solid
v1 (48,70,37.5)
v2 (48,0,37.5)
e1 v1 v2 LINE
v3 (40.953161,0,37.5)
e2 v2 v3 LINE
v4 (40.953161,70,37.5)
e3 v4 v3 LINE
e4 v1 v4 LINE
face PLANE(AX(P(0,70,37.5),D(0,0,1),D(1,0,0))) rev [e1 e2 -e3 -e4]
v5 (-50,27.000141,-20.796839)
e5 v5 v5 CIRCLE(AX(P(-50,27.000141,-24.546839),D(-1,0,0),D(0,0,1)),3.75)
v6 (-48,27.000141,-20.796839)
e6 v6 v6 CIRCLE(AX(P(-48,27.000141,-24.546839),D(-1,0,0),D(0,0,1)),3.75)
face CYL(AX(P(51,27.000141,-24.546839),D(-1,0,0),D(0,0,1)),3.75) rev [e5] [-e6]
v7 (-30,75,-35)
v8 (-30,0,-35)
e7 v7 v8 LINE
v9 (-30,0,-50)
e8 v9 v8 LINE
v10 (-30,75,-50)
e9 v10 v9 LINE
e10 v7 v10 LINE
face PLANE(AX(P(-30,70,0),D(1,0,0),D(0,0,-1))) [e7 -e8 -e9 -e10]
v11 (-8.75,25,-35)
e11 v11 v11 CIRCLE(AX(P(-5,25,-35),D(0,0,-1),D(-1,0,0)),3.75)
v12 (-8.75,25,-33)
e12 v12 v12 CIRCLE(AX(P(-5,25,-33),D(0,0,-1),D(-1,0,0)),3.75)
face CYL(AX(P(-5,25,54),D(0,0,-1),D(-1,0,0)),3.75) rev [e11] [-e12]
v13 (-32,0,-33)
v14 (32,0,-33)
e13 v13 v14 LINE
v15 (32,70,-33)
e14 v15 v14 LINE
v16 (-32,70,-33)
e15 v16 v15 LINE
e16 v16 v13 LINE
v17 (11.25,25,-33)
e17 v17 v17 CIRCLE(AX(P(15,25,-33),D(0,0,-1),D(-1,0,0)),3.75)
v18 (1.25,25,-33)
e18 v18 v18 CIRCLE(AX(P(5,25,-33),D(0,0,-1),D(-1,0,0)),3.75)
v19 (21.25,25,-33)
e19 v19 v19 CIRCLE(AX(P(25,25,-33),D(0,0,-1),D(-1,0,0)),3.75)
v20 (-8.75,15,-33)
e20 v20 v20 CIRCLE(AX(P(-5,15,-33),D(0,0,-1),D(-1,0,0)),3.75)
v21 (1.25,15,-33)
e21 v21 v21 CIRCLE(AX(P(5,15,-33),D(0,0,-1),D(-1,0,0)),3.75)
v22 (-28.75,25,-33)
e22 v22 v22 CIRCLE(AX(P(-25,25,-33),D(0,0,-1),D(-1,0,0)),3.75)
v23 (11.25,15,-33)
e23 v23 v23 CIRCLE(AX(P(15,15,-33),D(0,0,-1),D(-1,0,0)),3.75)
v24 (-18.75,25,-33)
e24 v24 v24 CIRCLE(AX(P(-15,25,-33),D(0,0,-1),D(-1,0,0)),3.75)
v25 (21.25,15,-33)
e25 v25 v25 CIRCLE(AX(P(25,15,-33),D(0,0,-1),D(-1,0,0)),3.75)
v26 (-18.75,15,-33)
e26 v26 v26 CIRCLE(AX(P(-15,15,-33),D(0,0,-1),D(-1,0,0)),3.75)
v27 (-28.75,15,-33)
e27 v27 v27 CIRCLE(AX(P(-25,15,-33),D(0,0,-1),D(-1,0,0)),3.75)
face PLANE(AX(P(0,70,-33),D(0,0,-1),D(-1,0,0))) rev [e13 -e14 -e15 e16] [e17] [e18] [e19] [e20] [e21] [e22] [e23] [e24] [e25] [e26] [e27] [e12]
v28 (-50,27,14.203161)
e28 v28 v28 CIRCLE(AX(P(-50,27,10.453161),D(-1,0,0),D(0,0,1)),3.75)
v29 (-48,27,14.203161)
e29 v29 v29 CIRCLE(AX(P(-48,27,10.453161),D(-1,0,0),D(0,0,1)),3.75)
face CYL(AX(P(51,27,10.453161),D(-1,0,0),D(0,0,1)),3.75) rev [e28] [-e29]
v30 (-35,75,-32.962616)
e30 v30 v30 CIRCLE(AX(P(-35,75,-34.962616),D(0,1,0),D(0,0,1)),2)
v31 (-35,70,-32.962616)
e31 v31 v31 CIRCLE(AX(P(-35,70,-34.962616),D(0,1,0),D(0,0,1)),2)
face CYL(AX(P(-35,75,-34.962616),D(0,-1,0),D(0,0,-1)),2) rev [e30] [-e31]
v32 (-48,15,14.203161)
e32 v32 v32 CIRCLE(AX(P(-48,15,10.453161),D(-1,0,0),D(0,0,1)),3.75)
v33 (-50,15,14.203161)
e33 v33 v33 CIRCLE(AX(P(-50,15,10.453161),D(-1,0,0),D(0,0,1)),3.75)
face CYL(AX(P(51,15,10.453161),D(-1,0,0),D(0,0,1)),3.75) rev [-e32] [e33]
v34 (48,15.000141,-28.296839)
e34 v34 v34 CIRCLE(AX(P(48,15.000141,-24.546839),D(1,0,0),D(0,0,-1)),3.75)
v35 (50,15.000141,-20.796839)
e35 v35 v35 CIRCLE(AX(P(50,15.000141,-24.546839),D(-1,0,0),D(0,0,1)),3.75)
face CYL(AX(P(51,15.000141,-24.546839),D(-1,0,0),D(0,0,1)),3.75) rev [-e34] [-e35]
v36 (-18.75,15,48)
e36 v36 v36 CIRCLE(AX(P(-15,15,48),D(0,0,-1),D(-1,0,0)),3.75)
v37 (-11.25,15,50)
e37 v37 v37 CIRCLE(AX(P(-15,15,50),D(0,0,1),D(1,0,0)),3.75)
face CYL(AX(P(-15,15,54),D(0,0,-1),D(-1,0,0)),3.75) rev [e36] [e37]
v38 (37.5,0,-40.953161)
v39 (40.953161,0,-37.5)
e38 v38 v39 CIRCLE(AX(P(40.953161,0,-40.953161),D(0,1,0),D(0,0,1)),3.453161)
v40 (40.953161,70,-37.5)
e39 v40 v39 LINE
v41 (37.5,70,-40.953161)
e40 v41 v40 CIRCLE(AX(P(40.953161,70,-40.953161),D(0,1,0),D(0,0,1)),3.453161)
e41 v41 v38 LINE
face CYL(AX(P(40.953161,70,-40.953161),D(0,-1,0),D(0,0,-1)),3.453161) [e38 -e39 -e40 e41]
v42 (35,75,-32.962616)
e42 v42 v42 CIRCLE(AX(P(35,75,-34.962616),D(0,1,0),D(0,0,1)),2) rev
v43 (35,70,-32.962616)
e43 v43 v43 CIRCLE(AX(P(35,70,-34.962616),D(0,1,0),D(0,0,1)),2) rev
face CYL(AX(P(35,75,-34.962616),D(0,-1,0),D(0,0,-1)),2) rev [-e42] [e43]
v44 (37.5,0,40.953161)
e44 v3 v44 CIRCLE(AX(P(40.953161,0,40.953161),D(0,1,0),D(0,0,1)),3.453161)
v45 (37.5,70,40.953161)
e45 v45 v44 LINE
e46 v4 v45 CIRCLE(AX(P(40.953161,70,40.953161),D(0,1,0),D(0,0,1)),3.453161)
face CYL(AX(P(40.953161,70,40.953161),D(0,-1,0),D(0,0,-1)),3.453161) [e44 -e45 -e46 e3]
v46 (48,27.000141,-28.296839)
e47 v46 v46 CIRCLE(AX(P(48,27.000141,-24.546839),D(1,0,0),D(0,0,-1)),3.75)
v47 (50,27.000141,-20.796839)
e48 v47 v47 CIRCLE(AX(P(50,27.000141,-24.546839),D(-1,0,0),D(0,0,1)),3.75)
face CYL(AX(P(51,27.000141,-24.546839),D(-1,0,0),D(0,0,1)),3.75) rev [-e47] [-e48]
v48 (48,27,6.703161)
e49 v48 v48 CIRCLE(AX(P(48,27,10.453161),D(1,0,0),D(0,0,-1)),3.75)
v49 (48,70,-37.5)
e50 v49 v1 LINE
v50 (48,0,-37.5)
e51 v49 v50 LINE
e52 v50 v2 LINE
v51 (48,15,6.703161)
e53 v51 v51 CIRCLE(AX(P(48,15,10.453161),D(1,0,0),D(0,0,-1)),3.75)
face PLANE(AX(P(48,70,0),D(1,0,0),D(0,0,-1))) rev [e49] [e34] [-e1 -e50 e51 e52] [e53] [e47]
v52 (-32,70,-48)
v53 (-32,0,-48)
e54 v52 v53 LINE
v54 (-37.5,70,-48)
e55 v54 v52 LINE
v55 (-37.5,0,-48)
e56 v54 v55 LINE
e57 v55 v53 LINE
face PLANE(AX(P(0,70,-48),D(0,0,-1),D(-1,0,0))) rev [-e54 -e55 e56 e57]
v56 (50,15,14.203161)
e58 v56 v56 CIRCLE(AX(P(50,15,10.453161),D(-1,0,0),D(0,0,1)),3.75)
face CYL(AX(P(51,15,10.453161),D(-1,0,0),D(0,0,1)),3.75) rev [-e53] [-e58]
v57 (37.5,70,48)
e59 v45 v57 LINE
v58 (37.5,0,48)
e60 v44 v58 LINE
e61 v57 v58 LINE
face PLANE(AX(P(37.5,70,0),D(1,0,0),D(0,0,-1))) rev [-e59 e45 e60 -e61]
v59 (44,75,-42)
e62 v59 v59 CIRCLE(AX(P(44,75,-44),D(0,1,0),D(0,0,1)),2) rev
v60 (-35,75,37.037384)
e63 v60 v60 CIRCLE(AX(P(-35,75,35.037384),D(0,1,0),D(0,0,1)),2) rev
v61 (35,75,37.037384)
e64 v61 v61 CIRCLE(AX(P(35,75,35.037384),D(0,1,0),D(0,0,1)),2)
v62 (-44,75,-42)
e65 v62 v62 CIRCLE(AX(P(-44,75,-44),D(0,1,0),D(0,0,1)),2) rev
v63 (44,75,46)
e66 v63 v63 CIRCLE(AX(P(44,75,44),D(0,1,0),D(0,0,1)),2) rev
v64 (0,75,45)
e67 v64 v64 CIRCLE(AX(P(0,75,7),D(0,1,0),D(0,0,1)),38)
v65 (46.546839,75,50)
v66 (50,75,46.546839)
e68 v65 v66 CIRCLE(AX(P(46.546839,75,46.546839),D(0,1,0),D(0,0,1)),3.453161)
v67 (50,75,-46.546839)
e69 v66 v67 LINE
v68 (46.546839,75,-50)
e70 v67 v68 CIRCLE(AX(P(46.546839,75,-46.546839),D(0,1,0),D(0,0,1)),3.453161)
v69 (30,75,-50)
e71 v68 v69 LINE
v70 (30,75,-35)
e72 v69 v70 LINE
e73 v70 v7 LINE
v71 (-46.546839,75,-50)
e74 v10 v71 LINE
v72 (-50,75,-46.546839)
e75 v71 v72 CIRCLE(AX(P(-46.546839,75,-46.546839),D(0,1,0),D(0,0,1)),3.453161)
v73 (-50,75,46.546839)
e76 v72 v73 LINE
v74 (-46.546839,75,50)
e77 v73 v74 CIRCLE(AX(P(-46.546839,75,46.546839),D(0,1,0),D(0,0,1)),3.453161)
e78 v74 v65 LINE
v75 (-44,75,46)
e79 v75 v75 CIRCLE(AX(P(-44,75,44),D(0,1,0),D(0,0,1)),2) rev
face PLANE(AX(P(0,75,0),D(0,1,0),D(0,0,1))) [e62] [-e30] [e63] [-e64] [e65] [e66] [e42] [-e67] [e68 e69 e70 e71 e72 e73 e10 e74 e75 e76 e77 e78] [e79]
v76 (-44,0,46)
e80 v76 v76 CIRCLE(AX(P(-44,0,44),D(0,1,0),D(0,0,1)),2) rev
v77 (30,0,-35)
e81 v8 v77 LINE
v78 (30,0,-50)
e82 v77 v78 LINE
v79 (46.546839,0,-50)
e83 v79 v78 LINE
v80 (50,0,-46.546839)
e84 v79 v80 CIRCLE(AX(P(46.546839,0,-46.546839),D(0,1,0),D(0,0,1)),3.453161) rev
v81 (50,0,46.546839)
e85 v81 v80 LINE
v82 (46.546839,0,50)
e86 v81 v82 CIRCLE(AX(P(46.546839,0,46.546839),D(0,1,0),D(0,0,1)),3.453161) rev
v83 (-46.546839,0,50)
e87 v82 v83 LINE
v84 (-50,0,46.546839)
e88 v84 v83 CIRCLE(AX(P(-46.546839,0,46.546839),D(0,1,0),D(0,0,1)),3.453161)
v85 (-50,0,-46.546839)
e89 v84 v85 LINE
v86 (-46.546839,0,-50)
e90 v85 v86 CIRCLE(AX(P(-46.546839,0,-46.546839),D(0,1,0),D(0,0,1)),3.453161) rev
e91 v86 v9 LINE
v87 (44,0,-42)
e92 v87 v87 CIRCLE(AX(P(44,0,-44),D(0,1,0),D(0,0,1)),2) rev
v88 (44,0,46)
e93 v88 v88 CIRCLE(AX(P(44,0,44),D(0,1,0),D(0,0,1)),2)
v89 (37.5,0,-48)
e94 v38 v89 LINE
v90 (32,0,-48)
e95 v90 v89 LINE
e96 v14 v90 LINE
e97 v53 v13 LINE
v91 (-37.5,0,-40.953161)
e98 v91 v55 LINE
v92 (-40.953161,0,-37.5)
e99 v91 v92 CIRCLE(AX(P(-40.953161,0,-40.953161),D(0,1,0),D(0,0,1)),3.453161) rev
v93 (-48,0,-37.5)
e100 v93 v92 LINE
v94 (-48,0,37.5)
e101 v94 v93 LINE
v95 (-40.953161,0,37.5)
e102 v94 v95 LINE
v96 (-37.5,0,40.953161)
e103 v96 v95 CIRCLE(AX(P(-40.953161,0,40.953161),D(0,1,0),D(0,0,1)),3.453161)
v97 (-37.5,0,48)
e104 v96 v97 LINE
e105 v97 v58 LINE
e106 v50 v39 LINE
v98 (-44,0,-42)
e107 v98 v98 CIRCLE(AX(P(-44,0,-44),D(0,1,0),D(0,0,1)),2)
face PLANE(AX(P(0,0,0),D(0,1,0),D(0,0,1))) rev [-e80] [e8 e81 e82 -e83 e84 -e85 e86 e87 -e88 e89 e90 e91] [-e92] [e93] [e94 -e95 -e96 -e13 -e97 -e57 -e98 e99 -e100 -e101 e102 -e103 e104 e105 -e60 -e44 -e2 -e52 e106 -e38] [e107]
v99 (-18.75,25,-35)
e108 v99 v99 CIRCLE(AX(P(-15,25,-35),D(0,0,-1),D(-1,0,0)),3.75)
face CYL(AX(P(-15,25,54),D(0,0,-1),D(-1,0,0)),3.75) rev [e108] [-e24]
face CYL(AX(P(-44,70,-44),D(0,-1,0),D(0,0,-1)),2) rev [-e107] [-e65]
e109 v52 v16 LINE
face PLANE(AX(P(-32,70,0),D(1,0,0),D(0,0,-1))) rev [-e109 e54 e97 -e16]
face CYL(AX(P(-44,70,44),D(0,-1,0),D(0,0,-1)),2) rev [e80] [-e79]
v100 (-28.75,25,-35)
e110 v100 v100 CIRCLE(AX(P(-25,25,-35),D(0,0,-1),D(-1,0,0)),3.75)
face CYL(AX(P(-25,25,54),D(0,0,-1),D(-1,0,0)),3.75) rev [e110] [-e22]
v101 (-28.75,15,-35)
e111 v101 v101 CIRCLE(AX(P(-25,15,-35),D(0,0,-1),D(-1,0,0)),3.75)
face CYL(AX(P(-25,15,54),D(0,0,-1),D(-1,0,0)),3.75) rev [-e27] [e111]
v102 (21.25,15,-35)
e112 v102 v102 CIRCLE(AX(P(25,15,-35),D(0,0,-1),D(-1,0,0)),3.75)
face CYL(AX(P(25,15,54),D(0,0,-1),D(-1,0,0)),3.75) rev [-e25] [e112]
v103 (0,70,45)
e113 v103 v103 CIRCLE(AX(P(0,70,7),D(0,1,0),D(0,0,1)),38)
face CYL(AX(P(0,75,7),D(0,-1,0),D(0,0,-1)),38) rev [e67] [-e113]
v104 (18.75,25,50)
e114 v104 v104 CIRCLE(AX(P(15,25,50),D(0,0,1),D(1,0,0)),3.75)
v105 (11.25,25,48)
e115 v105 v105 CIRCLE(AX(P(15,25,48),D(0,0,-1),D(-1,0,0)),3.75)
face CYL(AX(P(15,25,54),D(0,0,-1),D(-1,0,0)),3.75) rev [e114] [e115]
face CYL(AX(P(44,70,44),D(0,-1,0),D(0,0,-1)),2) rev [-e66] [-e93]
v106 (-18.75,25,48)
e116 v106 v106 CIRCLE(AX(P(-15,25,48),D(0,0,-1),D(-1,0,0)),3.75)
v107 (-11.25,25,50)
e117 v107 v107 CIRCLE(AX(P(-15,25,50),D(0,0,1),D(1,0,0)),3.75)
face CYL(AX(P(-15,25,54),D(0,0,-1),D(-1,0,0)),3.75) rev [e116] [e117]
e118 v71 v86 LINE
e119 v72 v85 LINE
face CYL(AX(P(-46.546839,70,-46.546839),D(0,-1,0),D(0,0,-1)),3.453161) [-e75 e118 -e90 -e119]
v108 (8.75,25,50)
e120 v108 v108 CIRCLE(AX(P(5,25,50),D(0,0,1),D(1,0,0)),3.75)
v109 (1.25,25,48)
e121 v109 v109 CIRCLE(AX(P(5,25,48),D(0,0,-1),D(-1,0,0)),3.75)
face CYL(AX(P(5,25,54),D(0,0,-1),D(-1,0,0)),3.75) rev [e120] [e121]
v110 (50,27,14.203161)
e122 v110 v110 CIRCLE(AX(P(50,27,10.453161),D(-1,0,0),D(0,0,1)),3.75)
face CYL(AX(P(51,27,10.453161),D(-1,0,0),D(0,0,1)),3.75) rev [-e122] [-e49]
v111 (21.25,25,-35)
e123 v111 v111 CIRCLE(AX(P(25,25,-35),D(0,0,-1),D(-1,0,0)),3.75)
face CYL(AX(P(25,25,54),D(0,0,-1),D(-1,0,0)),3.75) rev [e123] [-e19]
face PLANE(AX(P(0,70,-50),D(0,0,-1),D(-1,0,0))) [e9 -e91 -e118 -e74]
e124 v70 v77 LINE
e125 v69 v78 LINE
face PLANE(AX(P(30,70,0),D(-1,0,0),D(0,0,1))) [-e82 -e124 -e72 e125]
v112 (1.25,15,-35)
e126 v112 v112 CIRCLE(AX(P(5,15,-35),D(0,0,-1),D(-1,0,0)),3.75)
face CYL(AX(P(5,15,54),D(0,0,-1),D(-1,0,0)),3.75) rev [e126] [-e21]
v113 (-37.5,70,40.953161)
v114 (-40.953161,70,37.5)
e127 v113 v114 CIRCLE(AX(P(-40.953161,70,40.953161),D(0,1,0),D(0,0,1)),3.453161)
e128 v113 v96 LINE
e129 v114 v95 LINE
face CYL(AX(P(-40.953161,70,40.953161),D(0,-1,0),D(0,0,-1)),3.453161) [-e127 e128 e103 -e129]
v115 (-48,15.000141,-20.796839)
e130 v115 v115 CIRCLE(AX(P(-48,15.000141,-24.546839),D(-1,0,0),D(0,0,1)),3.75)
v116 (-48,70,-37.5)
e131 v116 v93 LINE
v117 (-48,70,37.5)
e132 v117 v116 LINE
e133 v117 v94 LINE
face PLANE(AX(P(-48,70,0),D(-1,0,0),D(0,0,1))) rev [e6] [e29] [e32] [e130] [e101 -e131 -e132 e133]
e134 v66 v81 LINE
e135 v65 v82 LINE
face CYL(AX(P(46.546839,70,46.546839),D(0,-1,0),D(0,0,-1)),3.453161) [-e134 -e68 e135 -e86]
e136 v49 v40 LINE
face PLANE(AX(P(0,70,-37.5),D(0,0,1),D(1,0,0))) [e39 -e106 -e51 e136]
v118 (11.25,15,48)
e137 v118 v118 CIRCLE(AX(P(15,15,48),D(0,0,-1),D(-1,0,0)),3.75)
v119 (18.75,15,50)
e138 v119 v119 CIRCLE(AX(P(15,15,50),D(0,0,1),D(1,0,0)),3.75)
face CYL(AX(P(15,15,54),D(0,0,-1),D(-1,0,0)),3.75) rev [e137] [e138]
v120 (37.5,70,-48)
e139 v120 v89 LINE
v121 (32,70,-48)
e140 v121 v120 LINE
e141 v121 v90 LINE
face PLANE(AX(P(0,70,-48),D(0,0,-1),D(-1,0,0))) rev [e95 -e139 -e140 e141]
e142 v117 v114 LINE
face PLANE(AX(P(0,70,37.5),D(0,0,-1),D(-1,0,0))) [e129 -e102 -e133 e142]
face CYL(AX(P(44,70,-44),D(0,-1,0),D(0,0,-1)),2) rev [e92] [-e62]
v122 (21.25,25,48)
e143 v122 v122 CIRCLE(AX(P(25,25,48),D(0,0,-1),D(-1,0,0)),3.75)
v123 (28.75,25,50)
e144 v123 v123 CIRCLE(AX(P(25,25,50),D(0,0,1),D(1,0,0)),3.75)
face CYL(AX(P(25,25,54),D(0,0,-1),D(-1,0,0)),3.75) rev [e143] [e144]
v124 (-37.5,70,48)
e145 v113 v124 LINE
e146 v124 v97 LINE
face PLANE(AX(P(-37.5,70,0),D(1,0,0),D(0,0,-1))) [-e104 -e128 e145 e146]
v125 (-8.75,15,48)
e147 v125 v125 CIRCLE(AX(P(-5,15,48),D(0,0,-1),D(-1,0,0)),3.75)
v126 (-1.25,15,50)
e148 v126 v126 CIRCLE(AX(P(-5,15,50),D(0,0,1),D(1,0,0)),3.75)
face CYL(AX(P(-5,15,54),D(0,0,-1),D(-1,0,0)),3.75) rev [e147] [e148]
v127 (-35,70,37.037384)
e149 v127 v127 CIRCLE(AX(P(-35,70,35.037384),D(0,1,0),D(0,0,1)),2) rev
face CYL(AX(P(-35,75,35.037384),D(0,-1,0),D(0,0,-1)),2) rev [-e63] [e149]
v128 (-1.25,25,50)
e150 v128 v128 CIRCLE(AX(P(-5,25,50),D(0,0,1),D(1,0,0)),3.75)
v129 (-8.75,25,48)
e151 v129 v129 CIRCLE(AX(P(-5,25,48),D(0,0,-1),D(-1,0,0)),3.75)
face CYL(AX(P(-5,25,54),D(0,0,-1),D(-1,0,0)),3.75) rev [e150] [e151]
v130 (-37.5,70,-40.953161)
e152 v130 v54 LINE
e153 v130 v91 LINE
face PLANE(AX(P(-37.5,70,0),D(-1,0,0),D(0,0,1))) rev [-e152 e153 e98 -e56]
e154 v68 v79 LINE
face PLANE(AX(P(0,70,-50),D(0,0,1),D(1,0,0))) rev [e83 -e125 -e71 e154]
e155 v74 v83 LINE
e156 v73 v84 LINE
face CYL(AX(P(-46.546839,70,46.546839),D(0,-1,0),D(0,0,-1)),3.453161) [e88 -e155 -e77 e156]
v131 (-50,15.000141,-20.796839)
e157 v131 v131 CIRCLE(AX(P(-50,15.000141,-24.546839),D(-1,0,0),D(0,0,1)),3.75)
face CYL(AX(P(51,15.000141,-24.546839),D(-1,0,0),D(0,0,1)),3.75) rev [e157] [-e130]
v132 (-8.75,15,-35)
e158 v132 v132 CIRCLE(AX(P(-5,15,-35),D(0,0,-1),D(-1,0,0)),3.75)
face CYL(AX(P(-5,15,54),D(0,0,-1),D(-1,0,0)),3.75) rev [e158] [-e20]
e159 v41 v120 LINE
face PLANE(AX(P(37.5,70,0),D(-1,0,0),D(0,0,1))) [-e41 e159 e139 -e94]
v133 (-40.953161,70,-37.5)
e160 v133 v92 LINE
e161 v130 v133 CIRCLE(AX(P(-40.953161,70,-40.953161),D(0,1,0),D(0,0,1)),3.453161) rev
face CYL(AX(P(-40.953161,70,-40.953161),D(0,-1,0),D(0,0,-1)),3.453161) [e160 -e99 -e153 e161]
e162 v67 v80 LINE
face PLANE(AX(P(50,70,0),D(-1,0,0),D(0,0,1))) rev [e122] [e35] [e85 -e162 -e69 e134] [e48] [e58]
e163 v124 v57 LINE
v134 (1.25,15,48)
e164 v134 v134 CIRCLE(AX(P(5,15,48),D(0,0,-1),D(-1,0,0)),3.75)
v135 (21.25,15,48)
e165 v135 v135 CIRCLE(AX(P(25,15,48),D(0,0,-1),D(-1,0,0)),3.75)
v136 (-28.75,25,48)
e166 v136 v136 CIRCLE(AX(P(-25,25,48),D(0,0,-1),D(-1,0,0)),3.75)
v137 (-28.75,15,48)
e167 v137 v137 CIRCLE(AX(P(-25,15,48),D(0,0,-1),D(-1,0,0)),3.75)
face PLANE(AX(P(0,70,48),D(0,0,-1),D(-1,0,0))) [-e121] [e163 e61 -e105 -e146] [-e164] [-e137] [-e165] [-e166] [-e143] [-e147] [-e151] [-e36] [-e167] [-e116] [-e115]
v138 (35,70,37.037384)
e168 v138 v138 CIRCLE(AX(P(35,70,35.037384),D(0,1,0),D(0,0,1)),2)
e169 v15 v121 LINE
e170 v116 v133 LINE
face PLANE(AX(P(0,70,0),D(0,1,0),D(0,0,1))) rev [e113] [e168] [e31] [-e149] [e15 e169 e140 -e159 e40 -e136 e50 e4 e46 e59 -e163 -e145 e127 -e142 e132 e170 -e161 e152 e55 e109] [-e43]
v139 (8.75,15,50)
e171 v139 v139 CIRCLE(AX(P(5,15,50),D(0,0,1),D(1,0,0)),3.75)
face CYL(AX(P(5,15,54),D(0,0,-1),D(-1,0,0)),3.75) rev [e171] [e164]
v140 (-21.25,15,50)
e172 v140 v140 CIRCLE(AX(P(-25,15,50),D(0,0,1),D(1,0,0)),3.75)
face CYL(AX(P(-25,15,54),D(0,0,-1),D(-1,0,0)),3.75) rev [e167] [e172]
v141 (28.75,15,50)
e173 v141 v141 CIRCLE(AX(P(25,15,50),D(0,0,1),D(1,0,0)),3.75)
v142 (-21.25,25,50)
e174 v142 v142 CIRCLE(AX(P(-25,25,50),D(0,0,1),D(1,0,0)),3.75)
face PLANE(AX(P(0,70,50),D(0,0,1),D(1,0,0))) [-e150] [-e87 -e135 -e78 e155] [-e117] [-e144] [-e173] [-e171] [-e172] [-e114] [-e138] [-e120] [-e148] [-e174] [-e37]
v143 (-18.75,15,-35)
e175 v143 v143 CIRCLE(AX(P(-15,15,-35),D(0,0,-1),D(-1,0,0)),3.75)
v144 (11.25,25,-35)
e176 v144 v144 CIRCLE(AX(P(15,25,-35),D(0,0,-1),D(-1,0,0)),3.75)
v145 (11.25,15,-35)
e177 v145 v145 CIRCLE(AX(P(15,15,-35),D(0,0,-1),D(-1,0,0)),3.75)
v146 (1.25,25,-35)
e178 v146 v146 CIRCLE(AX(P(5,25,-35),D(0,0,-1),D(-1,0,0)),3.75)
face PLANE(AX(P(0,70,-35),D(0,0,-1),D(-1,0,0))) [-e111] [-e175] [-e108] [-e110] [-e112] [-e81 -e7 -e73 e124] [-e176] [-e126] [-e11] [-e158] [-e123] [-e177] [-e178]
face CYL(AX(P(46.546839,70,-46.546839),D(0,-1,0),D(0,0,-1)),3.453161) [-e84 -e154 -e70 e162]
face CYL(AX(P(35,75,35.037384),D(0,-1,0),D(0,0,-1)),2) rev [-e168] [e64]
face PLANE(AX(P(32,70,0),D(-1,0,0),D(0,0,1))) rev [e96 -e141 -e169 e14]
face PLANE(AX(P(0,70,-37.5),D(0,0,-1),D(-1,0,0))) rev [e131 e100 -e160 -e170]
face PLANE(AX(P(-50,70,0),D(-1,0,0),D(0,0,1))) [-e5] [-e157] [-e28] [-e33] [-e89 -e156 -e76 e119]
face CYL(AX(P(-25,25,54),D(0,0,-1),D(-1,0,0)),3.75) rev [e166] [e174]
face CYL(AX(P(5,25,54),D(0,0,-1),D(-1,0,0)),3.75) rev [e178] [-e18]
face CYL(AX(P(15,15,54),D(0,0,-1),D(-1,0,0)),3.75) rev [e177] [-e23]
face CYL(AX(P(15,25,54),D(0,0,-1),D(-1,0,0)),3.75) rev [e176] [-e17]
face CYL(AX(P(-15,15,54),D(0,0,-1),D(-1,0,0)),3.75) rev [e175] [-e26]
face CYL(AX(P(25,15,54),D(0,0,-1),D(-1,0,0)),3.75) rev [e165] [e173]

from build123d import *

# Parameters (mm, degrees)
SKETCH2_R                 = 2
BOSS_EXTRUDE1_DEPTH       = 70
BOSS_EXTRUDE2_OUTLINE_R   = 2
BOSS_EXTRUDE2_OUTLINE_R_2 = 38
BOSS_EXTRUDE2_DEPTH       = 5
SKETCH5_R                 = 3.75
CUT_EXTRUDE1_DEPTH        = 89
SKETCH6_R                 = 3.75
CUT_EXTRUDE2_DEPTH        = 101


# Read off the part's stored shape, not the designer's step: Boss-Extrude2
with BuildPart() as part:
    # Sketch2 → Boss-Extrude1 (new body)
    with BuildSketch(Plane(origin=(0, 0, 0), x_dir=(1, 0, 0), z_dir=(0, 1, 0))):
        with BuildLine():
            Line((-40.95316077, -50), (-46.54683923, -50))
            ThreePointArc((-46.54683923, -50), (-48.988592627, -48.988592627), (-50, -46.54683923))
            Line((-50, -46.54683923), (-50, -40.95316077))
            Line((-50, -40.95316077), (-50, 40.95316077))
            Line((-50, 40.95316077), (-50, 46.54683923))
            ThreePointArc((-50, 46.54683923), (-48.988592627, 48.988592627), (-46.54683923, 50))
            Line((-46.54683923, 50), (-40.95316077, 50))
            Line((-40.95316077, 50), (-30, 50))
            Line((-30, 50), (-30, 35))
            Line((-30, 35), (30, 35))
            Line((30, 35), (30, 50))
            Line((30, 50), (40.95316077, 50))
            Line((40.95316077, 50), (46.54683923, 50))
            ThreePointArc((46.54683923, 50), (48.988592627, 48.988592627), (50, 46.54683923))
            Line((50, 46.54683923), (50, 40.95316077))
            Line((50, 40.95316077), (50, -40.95316077))
            Line((50, -40.95316077), (50, -46.54683923))
            ThreePointArc((50, -46.54683923), (48.988592627, -48.988592627), (46.54683923, -50))
            Line((46.54683923, -50), (40.95316077, -50))
            Line((40.95316077, -50), (-40.95316077, -50))
        make_face()
        with Locations(Location((-44, 44, 0), (0, 0, 270))):
            Circle(SKETCH2_R, mode=Mode.SUBTRACT)
        with Locations(Location((44, 44, 0), (0, 0, 270))):
            Circle(SKETCH2_R, mode=Mode.SUBTRACT)
        with Locations(Location((44, -44, 0), (0, 0, 270))):
            Circle(SKETCH2_R, mode=Mode.SUBTRACT)
        with Locations(Location((-44, -44, 0), (0, 0, 270))):
            Circle(SKETCH2_R, mode=Mode.SUBTRACT)
        with BuildLine():
            Line((-48, -37.5), (-40.95316077, -37.5))
            ThreePointArc((-40.95316077, -37.5), (-38.511407373, -38.511407373), (-37.5, -40.95316077))
            Line((-37.5, -40.95316077), (-37.5, -48))
            Line((-37.5, -48), (37.5, -48))
            Line((37.5, -48), (37.5, -40.95316077))
            ThreePointArc((37.5, -40.95316077), (38.511407373, -38.511407373), (40.95316077, -37.5))
            Line((40.95316077, -37.5), (48, -37.5))
            Line((48, -37.5), (48, 37.5))
            Line((48, 37.5), (40.95316077, 37.5))
            ThreePointArc((40.95316077, 37.5), (38.511407373, 38.511407373), (37.5, 40.95316077))
            Line((37.5, 40.95316077), (37.5, 48))
            Line((37.5, 48), (32, 48))
            Line((32, 48), (32, 33))
            Line((32, 33), (-32, 33))
            Line((-32, 33), (-32, 48))
            Line((-32, 48), (-37.5, 48))
            Line((-37.5, 48), (-37.5, 40.95316077))
            ThreePointArc((-37.5, 40.95316077), (-38.511407373, 38.511407373), (-40.95316077, 37.5))
            Line((-40.95316077, 37.5), (-48, 37.5))
            Line((-48, 37.5), (-48, -37.5))
        make_face(mode=Mode.SUBTRACT)
    extrude(amount=BOSS_EXTRUDE1_DEPTH)

    # Boss-Extrude2 outline → Boss-Extrude2 (add)
    with BuildSketch(Plane(origin=(0, 70, 0), x_dir=(1, 0, 0), z_dir=(0, 1, 0))):
        with BuildLine():
            ThreePointArc((-46.54683923, 50), (-48.988592627, 48.988592627), (-50, 46.54683923))
            Line((-50, 46.54683923), (-50, -46.54683923))
            ThreePointArc((-50, -46.54683923), (-48.988592627, -48.988592627), (-46.54683923, -50))
            Line((-46.54683923, -50), (46.54683923, -50))
            ThreePointArc((46.54683923, -50), (48.988592627, -48.988592627), (50, -46.54683923))
            Line((50, -46.54683923), (50, 46.54683923))
            ThreePointArc((50, 46.54683923), (48.988592627, 48.988592627), (46.54683923, 50))
            Line((46.54683923, 50), (30, 50))
            Line((30, 50), (30, 35))
            Line((30, 35), (-30, 35))
            Line((-30, 35), (-30, 50))
            Line((-30, 50), (-46.54683923, 50))
        make_face()
        with Locations((-44, -44)):
            Circle(BOSS_EXTRUDE2_OUTLINE_R, mode=Mode.SUBTRACT)
        with Locations((-35, -35.037384196)):
            Circle(BOSS_EXTRUDE2_OUTLINE_R, mode=Mode.SUBTRACT)
        with Locations((44, -44)):
            Circle(BOSS_EXTRUDE2_OUTLINE_R, mode=Mode.SUBTRACT)
        with Locations((35, -35.037384196)):
            Circle(BOSS_EXTRUDE2_OUTLINE_R, mode=Mode.SUBTRACT)
        with Locations((0, -7)):
            Circle(BOSS_EXTRUDE2_OUTLINE_R_2, mode=Mode.SUBTRACT)
        with Locations((-35, 34.962615804)):
            Circle(BOSS_EXTRUDE2_OUTLINE_R, mode=Mode.SUBTRACT)
        with Locations((-44, 44)):
            Circle(BOSS_EXTRUDE2_OUTLINE_R, mode=Mode.SUBTRACT)
        with Locations((35, 34.962615804)):
            Circle(BOSS_EXTRUDE2_OUTLINE_R, mode=Mode.SUBTRACT)
        with Locations((44, 44)):
            Circle(BOSS_EXTRUDE2_OUTLINE_R, mode=Mode.SUBTRACT)
    extrude(amount=BOSS_EXTRUDE2_DEPTH)

    # Sketch5 → Cut-Extrude1 (cut)
    with BuildSketch(Plane(origin=(0, 0, -35), x_dir=(-1, 0, 0), z_dir=(0, 0, -1))):
        with Locations((-25, 15)):
            Circle(SKETCH5_R)
        with Locations((-15, 15)):
            Circle(SKETCH5_R)
        with Locations((-5, 15)):
            Circle(SKETCH5_R)
        with Locations((5, 15)):
            Circle(SKETCH5_R)
        with Locations((15, 15)):
            Circle(SKETCH5_R)
        with Locations((25, 15)):
            Circle(SKETCH5_R)
        with Locations((-25, 25)):
            Circle(SKETCH5_R)
        with Locations((-5, 25)):
            Circle(SKETCH5_R)
        with Locations((5, 25)):
            Circle(SKETCH5_R)
        with Locations((15, 25)):
            Circle(SKETCH5_R)
        with Locations((25, 25)):
            Circle(SKETCH5_R)
        with Locations((-15, 25)):
            Circle(SKETCH5_R)
    extrude(amount=-CUT_EXTRUDE1_DEPTH, mode=Mode.SUBTRACT)

    # Sketch6 → Cut-Extrude2 (cut)
    with BuildSketch(Plane.ZY.offset(50)):
        with Locations((-24.54683923, 15.00014135)):
            Circle(SKETCH6_R)
        with Locations((10.45316077, 15.000000015)):
            Circle(SKETCH6_R)
        with Locations((10.45316077, 27.000000015)):
            Circle(SKETCH6_R)
        with Locations((-24.54683923, 27.00014135)):
            Circle(SKETCH6_R)
    extrude(amount=-CUT_EXTRUDE2_DEPTH, mode=Mode.SUBTRACT)


solid = part.part
